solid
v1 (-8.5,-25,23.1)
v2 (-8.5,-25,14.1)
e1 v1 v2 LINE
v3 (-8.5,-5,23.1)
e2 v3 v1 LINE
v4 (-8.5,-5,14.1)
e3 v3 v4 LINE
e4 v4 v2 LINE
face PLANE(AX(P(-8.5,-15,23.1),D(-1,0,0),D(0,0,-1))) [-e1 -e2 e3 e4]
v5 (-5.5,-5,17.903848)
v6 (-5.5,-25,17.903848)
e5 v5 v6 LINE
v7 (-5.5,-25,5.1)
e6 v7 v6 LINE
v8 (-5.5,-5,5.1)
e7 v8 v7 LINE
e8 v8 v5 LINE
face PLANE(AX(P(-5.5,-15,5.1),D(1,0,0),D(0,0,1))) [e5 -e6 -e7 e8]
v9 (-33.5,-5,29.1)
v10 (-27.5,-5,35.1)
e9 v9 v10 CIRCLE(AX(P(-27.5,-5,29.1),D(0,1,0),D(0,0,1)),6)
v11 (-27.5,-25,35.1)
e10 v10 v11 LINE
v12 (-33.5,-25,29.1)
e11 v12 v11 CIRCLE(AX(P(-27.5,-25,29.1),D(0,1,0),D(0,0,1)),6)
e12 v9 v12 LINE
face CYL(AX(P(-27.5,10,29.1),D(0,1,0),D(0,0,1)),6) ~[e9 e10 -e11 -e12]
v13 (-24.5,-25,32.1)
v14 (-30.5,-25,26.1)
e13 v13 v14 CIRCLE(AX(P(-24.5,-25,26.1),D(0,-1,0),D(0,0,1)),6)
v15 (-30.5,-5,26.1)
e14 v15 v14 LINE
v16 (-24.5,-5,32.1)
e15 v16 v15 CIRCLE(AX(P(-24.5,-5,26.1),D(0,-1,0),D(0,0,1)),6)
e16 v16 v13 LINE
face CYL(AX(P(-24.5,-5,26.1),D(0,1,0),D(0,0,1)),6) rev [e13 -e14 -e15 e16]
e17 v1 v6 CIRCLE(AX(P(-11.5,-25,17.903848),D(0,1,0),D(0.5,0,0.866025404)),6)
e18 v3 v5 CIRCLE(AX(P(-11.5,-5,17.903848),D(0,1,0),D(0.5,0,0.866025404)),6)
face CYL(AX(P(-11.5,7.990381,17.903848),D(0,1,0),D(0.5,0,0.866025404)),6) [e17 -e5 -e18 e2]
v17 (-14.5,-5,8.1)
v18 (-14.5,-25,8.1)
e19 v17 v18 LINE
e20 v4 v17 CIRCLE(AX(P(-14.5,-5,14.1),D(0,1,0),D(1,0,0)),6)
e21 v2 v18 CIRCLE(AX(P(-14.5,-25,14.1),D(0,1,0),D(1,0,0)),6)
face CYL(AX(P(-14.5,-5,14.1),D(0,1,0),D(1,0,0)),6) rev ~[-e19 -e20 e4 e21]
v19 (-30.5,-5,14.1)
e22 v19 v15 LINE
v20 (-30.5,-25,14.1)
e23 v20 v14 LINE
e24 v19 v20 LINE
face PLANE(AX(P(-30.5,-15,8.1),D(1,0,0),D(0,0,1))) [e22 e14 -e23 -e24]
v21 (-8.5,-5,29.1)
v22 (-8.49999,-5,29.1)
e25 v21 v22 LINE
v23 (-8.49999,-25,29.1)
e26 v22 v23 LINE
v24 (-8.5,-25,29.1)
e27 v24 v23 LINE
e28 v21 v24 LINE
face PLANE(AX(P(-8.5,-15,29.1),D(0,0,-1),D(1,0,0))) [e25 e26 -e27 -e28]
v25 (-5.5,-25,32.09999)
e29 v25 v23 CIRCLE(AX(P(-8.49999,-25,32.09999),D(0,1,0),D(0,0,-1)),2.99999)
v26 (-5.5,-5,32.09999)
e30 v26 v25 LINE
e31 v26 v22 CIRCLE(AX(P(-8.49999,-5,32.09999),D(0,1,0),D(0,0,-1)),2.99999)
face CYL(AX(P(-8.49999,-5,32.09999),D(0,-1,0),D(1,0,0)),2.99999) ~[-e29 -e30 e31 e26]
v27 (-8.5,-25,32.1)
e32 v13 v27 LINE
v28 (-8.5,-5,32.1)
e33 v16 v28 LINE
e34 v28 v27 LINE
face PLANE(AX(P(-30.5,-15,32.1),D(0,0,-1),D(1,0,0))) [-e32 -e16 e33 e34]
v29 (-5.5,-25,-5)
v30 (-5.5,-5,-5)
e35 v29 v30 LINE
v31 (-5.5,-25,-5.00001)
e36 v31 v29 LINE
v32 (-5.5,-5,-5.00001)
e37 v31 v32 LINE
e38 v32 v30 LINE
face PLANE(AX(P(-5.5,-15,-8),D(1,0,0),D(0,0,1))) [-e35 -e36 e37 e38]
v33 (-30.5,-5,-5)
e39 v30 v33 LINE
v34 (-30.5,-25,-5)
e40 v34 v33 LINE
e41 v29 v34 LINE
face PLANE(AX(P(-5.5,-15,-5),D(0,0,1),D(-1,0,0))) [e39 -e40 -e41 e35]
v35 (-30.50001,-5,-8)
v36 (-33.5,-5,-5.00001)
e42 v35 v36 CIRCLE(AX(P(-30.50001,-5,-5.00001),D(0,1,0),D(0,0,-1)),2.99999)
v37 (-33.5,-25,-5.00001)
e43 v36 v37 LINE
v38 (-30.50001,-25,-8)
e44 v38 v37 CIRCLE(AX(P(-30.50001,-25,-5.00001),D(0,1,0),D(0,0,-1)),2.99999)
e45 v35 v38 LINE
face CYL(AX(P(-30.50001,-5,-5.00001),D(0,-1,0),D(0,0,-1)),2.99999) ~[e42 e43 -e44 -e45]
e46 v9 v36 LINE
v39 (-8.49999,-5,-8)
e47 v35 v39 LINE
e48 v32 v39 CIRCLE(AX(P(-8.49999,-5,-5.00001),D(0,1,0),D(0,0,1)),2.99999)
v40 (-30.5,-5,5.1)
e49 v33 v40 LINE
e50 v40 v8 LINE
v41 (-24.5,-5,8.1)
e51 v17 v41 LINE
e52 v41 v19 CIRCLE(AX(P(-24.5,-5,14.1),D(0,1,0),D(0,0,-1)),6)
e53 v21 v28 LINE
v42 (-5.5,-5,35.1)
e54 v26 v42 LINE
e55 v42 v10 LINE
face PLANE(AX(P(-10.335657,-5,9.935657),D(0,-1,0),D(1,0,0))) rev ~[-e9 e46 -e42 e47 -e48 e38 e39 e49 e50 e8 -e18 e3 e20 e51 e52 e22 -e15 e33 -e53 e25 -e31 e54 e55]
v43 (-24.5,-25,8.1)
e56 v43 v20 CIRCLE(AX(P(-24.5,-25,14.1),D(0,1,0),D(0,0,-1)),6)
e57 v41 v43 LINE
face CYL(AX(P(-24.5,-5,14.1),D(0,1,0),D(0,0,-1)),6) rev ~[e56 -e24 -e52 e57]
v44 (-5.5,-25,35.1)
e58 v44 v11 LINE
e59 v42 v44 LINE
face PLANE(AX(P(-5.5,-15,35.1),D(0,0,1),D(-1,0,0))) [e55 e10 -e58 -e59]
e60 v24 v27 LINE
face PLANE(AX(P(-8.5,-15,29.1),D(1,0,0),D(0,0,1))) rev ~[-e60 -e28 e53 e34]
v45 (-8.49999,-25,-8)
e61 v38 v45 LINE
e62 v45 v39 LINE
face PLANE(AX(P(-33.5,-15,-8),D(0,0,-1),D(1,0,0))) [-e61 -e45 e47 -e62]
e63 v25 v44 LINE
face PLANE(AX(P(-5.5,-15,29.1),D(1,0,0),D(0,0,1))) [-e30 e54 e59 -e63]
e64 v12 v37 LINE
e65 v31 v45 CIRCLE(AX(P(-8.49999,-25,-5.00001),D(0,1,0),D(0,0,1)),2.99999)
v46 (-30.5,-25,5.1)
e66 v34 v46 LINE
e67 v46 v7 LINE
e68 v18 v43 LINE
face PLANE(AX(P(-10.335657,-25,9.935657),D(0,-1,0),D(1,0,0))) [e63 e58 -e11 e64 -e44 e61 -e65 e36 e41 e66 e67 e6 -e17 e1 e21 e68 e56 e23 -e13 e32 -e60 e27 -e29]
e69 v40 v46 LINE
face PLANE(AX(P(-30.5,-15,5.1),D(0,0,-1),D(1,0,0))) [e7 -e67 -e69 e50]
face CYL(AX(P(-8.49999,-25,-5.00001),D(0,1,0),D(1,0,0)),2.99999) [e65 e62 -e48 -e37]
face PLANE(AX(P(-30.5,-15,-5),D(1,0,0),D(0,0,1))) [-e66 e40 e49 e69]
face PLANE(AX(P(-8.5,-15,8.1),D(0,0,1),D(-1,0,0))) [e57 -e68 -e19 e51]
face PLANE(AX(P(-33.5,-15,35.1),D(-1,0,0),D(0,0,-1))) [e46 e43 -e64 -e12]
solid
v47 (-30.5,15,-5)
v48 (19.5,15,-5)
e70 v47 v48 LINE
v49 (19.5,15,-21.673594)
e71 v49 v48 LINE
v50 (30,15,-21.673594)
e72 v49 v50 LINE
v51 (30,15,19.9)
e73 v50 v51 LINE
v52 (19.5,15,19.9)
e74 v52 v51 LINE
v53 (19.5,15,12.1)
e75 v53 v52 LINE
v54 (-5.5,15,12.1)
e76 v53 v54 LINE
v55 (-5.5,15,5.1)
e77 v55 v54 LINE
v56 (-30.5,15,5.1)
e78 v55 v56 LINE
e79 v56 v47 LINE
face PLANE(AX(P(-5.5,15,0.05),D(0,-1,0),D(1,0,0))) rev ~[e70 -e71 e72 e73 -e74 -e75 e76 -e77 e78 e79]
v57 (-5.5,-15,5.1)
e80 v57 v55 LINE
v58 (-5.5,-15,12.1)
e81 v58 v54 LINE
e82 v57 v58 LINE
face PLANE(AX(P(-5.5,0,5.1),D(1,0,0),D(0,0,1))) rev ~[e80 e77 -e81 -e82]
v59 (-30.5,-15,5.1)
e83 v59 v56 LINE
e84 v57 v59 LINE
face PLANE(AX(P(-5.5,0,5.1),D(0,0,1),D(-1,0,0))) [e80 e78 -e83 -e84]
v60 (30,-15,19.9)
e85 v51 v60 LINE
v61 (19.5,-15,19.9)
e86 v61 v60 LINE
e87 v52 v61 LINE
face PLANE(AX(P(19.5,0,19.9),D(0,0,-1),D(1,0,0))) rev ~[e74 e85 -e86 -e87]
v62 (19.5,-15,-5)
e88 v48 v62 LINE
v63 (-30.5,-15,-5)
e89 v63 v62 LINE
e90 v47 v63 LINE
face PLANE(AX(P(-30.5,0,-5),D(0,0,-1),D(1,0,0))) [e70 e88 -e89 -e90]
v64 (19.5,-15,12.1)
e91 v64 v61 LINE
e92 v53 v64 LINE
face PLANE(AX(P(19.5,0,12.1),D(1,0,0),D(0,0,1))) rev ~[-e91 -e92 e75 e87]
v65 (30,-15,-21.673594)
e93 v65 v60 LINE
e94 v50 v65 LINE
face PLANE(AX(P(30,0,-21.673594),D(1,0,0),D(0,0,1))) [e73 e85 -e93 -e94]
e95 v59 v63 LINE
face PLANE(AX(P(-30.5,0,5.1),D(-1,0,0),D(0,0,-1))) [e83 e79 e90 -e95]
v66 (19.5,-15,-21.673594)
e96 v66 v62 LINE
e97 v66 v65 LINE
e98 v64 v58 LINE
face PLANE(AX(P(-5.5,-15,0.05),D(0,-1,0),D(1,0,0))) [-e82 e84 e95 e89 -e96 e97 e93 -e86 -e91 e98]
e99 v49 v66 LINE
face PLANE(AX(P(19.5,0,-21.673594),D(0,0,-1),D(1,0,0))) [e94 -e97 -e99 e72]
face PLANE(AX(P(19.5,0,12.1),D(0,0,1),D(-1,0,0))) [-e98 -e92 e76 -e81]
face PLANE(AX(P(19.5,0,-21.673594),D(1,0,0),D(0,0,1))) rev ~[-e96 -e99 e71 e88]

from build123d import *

# Parameters (mm, degrees)
F0_W          = 25
F0_H          = 7
F0_W_2        = 10.5
F0_H_2        = 10.1
F0_H_3        = 16.6735936701
F0_H_4        = 7.8
F1_DEPTH      = 15
F1_DEPTH_BACK = 15
F2_W          = 3
F2_H          = 3
F3_DEPTH      = 10
F3_DEPTH_BACK = 10
F4_T1_DEPTH   = 20
F4_T3_DEPTH   = 20
F4_T5_DEPTH   = 20
F4_T7_DEPTH   = 50
F4_T9_DEPTH   = 45.9807621135
F5_R          = 2.99999


# Not quite as in the source:
# - a fillet or chamfer that OpenCascade refuses, or shapes differently, is made with other operations: its cross-section is extruded or revolved along the edge and cut away or added
# - a fillet or chamfer is up to 0.001 mm smaller than in the source, because OpenCascade refuses the exact size
# - a feature names something its author has since deleted; it is built from what else it names


with BuildPart() as f1:
    # F0 (on Front) → F1 (new body, two sides)
    with BuildSketch(Plane.XZ) as f1_sk:
        Polygon((-5.5, 5.1), (-30.5, 5.1), (-30.5, -5), (19.5, -5), (19.5, 5.1), align=None)
        with Locations((7, 8.6)):
            Rectangle(F0_W, F0_H)
        with Locations((24.75, 8.6)):
            Rectangle(F0_W_2, F0_H)
        with Locations((24.75, 0.05)):
            Rectangle(F0_W_2, F0_H_2)
        with Locations((24.75, -13.3367968351)):
            Rectangle(F0_W_2, F0_H_3)
        with Locations((24.75, 16)):
            Rectangle(F0_W_2, F0_H_4)
    extrude(amount=F1_DEPTH)
    extrude(f1_sk.sketch, amount=-F1_DEPTH_BACK)


with BuildPart() as f3:
    # F2 (on face) → F3 (new body, two sides)
    with BuildSketch(Plane.XZ.offset(15)) as f3_sk:
        Polygon((-30.5, -5), (-30.5, 5.1), (-5.5, 5.1), (-5.5, 12.1), (-5.5, 23.1), (-8.5, 23.1), (-8.5, 15.1), (-8.5, 8.1), (-30.5, 8.1), (-30.5, 32.1), (-8.5, 32.1), (-5.5, 32.1), (-5.5, 35.1), (-33.5, 35.1), (-33.5, 8.1), (-33.5, -5), (-33.5, -8), (-5.5, -8), (-5.5, -5), align=None)
        with Locations((-7, 30.6)):
            Rectangle(F2_W, F2_H)
    extrude(amount=F3_DEPTH)
    extrude(f3_sk.sketch, amount=-F3_DEPTH_BACK)

    # F4: fillet of radius 6 on 5 edges, made by hand

    # F4_s2 → F4_t1 (join)
    with BuildSketch(Plane.XZ.offset(5)):
        with BuildLine():
            ThreePointArc((-24.5, 32.1), (-28.7426406871, 30.3426406871), (-30.5, 26.1))
            Line((-30.5, 26.1), (-30.5, 32.1))
            Line((-30.5, 32.1), (-24.5, 32.1))
        make_face()
    extrude(amount=F4_T1_DEPTH)

    # F4_s4 → F4_t3 (join)
    with BuildSketch(Plane.XZ.offset(5)):
        with BuildLine():
            ThreePointArc((-24.5, 8.1), (-28.7426406871, 9.8573593129), (-30.5, 14.1))
            Line((-30.5, 14.1), (-30.5, 8.1))
            Line((-30.5, 8.1), (-24.5, 8.1))
        make_face()
    extrude(amount=F4_T3_DEPTH)

    # F4_s6 → F4_t5 (join)
    with BuildSketch(Plane.XZ.offset(5)):
        with BuildLine():
            ThreePointArc((-8.5, 14.1), (-10.2573593129, 9.8573593129), (-14.5, 8.1))
            Line((-14.5, 8.1), (-8.5, 8.1))
            Line((-8.5, 8.1), (-8.5, 14.1))
        make_face()
    extrude(amount=F4_T5_DEPTH)

    # F4_s8 → F4_t7 (cut)
    with BuildSketch(Plane.XZ.offset(-10)):
        with BuildLine():
            ThreePointArc((-27.5, 35.1), (-31.7426406871, 33.3426406871), (-33.5, 29.1))
            Line((-33.5, 29.1), (-33.5, 35.1))
            Line((-33.5, 35.1), (-27.5, 35.1))
        make_face()
    extrude(amount=F4_T7_DEPTH, mode=Mode.SUBTRACT)

    # F4_s10 → F4_t9 (cut)
    with BuildSketch(Plane.XZ.offset(-7.9903810568)):
        with BuildLine():
            ThreePointArc((-8.5, 23.1), (-6.3038475773, 20.9038475773), (-5.5, 17.9038475773))
            Line((-5.5, 17.9038475773), (-5.5, 23.1))
            Line((-5.5, 23.1), (-8.5, 23.1))
        make_face()
    extrude(amount=F4_T9_DEPTH, mode=Mode.SUBTRACT)

    # F5 (radius 3 in the source; OpenCascade refuses exactly that, so slightly less here)
    f5_edges = [f3.edges().sort_by_distance(p)[0] for p in [
        (-33.5, -15, -8),
        (-5.5, -15, 29.1),
        (-5.5, -15, -8),
    ]]
    fillet(f5_edges, radius=F5_R)


solid = Compound([f1.part, f3.part])
